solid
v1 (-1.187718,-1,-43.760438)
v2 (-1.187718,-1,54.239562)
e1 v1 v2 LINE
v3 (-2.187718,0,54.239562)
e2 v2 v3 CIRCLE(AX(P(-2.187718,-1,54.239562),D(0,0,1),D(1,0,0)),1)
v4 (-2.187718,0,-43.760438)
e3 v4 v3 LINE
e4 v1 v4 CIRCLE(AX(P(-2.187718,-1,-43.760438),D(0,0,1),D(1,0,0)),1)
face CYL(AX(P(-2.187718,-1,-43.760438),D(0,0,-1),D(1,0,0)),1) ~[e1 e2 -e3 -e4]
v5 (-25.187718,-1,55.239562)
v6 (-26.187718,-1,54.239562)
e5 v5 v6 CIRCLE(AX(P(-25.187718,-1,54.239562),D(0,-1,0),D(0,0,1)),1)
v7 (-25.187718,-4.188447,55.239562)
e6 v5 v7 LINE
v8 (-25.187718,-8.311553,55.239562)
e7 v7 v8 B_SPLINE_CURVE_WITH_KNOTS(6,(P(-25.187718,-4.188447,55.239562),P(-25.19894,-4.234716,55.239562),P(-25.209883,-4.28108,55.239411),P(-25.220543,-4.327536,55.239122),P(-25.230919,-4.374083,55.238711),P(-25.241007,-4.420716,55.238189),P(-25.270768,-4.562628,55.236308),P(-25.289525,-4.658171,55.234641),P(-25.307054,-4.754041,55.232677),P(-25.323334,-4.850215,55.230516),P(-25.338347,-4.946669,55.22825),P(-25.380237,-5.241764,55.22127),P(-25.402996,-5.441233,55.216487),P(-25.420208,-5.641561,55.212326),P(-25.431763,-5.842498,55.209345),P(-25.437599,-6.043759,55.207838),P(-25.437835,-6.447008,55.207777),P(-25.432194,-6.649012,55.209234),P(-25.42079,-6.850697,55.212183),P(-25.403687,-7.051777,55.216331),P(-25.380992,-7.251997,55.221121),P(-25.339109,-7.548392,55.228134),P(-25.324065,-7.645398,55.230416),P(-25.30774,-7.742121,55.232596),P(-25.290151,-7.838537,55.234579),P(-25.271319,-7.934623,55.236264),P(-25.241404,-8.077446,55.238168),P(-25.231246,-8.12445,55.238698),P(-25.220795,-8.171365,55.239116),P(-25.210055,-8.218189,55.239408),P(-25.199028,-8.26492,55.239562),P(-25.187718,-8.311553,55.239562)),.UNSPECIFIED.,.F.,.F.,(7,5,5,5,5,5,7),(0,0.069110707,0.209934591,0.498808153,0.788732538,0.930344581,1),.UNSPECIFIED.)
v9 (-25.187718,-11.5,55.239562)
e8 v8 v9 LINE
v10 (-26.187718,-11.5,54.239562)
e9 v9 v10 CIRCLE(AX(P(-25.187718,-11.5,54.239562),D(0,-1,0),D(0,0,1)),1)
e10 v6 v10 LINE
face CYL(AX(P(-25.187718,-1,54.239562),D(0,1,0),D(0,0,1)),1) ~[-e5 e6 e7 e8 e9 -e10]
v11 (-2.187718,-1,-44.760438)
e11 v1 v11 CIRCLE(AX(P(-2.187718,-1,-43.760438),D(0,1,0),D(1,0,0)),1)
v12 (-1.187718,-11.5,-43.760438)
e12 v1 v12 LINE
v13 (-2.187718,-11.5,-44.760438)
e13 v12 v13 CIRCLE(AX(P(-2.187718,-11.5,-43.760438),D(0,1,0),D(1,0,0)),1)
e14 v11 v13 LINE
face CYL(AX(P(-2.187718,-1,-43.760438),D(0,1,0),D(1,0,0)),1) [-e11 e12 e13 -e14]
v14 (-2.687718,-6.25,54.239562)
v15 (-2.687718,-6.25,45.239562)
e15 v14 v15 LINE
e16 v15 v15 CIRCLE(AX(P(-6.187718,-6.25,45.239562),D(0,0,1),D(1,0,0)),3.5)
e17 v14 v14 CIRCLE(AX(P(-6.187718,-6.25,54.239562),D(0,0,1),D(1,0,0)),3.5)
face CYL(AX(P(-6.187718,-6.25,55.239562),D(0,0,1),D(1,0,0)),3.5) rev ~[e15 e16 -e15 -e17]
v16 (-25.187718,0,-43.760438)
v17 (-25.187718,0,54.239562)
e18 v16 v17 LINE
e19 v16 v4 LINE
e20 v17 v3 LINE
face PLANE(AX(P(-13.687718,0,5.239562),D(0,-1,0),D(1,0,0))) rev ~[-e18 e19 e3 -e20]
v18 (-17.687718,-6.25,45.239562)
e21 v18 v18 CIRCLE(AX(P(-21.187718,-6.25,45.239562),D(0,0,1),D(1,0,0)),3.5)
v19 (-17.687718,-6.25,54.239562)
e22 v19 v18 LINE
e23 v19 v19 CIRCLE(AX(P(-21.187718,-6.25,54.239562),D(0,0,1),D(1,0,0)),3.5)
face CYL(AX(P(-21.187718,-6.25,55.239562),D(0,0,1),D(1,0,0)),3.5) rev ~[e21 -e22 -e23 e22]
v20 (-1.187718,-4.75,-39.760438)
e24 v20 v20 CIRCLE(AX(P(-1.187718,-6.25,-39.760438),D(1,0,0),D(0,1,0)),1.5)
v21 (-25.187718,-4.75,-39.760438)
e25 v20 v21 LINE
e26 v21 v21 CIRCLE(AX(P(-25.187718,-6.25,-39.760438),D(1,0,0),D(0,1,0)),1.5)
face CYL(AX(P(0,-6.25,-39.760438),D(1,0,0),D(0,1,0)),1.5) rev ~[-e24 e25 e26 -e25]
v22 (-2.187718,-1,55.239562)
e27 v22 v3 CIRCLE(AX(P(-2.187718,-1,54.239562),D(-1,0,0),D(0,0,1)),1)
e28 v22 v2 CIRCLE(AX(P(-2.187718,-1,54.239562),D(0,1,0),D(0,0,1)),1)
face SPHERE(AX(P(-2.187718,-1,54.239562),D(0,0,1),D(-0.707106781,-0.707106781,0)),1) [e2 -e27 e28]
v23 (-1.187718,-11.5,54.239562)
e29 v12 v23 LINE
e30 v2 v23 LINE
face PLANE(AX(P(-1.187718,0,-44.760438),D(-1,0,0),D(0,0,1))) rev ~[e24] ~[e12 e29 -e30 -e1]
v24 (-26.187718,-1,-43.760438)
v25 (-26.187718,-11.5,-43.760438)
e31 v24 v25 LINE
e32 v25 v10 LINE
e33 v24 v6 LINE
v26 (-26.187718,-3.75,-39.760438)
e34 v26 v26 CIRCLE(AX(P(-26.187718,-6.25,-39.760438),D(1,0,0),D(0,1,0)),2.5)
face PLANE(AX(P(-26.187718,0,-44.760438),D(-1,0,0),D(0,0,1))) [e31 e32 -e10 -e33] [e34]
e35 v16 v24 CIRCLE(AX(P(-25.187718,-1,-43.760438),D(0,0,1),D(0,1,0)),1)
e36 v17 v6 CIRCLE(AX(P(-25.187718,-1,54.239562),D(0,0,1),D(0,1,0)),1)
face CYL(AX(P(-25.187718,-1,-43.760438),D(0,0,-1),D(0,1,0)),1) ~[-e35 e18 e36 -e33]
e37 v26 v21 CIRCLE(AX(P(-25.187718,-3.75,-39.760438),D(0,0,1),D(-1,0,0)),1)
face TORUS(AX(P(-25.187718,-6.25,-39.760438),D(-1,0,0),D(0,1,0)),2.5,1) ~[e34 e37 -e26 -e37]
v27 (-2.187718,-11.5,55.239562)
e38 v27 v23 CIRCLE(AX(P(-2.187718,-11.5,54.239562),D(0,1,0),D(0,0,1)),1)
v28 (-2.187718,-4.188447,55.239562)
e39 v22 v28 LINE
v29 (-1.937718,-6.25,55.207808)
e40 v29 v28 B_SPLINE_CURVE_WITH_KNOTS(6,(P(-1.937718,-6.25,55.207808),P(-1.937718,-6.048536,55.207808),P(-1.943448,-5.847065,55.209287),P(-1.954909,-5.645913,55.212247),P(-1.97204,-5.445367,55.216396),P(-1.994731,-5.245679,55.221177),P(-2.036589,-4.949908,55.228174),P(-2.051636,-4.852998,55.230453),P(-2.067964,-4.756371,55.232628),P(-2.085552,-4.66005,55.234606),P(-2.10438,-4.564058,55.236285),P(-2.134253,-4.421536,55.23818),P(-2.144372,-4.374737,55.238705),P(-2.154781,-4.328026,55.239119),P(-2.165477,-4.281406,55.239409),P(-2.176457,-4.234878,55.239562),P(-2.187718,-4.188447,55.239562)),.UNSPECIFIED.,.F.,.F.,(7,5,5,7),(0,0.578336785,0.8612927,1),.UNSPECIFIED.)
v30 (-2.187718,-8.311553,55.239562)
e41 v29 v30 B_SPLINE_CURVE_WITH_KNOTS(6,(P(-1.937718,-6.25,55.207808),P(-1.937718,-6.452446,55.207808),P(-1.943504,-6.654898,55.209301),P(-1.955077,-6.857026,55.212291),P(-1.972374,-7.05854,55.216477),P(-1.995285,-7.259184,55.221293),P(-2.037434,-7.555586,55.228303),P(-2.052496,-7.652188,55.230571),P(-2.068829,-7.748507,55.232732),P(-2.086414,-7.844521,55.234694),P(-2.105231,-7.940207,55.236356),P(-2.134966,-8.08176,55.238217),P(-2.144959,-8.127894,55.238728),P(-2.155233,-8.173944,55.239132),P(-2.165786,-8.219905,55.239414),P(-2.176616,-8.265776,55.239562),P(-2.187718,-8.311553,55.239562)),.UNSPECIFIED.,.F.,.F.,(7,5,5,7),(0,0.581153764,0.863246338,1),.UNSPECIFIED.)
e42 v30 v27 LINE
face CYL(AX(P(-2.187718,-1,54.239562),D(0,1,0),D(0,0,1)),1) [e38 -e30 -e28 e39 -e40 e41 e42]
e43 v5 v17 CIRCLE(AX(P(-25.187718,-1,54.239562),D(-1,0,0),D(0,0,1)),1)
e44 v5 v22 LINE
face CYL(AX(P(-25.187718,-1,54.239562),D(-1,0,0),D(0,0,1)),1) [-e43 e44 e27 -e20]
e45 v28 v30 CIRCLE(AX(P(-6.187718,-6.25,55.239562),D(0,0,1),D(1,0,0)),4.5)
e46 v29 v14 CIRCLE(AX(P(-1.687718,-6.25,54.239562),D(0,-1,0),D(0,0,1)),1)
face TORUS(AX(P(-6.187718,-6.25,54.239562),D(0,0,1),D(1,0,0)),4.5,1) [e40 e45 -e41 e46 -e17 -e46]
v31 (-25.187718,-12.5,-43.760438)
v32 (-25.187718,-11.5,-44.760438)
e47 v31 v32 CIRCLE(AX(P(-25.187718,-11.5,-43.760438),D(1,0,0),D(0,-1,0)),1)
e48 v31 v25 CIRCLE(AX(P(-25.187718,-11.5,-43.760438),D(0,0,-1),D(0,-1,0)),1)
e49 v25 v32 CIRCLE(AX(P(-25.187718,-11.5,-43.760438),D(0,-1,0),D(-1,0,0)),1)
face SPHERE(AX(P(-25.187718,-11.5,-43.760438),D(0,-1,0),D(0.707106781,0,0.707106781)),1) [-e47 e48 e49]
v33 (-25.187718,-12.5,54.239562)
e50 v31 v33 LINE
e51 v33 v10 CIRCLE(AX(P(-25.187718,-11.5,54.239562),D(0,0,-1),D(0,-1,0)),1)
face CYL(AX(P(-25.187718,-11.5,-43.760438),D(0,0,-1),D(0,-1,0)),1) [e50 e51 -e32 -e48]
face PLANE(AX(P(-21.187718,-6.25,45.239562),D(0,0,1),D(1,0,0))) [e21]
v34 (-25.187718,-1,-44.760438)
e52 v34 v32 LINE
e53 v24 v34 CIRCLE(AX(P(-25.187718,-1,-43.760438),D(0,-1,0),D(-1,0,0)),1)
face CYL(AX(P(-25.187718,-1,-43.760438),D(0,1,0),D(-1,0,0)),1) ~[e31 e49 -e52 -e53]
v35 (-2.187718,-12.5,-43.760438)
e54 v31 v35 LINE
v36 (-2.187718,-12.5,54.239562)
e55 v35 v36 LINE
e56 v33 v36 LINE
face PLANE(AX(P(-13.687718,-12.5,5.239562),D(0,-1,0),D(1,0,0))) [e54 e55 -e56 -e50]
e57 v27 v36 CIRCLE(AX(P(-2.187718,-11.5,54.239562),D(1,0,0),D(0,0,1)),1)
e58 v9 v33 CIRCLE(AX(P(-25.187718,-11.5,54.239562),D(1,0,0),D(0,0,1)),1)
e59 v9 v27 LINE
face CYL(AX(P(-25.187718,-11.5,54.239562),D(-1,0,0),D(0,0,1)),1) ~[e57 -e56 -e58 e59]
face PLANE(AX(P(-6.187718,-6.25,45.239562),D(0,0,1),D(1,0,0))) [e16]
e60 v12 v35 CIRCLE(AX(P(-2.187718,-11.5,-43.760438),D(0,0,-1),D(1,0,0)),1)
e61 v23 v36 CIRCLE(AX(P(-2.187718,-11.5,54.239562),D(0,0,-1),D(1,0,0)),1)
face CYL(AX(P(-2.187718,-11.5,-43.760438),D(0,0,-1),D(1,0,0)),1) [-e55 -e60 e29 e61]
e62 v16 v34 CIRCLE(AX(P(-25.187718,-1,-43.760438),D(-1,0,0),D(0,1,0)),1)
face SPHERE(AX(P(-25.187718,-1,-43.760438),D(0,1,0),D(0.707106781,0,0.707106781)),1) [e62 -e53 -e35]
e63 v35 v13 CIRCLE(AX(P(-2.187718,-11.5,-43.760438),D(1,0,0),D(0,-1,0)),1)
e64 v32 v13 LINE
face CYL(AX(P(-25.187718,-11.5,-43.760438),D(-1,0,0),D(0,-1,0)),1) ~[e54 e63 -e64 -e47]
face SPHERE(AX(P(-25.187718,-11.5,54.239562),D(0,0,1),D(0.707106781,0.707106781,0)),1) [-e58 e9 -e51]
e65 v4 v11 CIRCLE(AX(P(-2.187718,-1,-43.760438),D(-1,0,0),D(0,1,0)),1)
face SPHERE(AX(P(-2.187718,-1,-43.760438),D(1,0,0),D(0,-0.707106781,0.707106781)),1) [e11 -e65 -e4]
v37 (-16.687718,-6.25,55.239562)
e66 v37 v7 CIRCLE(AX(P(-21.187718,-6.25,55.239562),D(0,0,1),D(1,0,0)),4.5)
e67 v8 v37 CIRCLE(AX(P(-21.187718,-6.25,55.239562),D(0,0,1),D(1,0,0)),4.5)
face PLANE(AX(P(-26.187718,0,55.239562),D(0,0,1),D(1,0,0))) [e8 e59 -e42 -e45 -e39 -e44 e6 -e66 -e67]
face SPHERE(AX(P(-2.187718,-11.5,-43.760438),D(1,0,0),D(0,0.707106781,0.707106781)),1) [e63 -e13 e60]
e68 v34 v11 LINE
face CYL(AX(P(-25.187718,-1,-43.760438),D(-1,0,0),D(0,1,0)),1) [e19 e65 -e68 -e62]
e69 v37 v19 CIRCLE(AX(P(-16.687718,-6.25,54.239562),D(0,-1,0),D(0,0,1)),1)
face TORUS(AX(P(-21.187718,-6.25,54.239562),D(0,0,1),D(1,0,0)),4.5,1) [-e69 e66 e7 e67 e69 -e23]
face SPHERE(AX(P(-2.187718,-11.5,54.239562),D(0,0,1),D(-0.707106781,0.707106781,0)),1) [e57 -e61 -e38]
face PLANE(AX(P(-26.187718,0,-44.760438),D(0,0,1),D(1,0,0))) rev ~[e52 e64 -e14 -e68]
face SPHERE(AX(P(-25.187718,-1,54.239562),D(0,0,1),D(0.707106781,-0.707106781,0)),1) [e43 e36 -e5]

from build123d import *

# Parameters (mm, degrees)
F0_W         = 25
F0_H         = 100
F1_DEPTH     = 12.5
F2_R         = 1.5
F3_DEPTH     = 27.19003
F4_R         = 3.5
F5_DEPTH     = 10
F6_T1_DEPTH  = 10.5
F6_T3_DEPTH  = 23
F6_T5_DEPTH  = 98
F6_S9_W      = 1
F6_S9_H      = 1
F6_T10_DEPTH = 1
F6_S15_W     = 1
F6_S15_H     = 1
F6_T16_DEPTH = 1
F6_S21_W     = 1
F6_S21_H     = 1
F6_T22_DEPTH = 1
F6_S27_W     = 1
F6_S27_H     = 1
F6_T28_DEPTH = 1
F6_S33_W     = 1
F6_S33_H     = 1
F6_T34_DEPTH = 1
F6_S39_W     = 1
F6_S39_H     = 1
F6_T40_DEPTH = 1
F6_S45_W     = 1
F6_S45_H     = 1
F6_T46_DEPTH = 1
F6_S51_W     = 1
F6_S51_H     = 1
F6_T52_DEPTH = 1


# Not quite as in the source:
# - a fillet or chamfer that OpenCascade refuses, or shapes differently, is made with other operations: its cross-section is extruded or revolved along the edge and cut away or added


with BuildPart() as f1:
    # F0 (on Front) → F1 (new body)
    with BuildSketch(Plane.XZ):
        with Locations((-13.6877183104, 5.2395616682)):
            Rectangle(F0_W, F0_H)
    extrude(amount=F1_DEPTH)

    # F2 (on Right) → F3 (cut)
    with BuildSketch(Plane.YZ):
        with Locations((-6.25, -39.7604383318)):
            Circle(F2_R)
    extrude(amount=-F3_DEPTH, mode=Mode.SUBTRACT)

    # F4 (on face) → F5 (cut)
    with BuildSketch(Plane.XY.offset(55.2395616682)):
        with Locations((-6.1877183104, -6.25)):
            Circle(F4_R)
        with Locations((-21.1877183104, -6.25)):
            Circle(F4_R)
    extrude(amount=-F5_DEPTH, mode=Mode.SUBTRACT)

    # F6: fillet of radius 1 on 15 edges, made by hand

    # F6_s2 → F6_t1 (cut)
    with BuildSketch(Plane.XZ.offset(1)):
        with BuildLine():
            ThreePointArc((-25.1877183104, 55.2395616682), (-25.8948250916, 54.9466684494), (-26.1877183104, 54.2395616682))
            Line((-26.1877183104, 54.2395616682), (-26.1877183104, 55.2395616682))
            Line((-26.1877183104, 55.2395616682), (-25.1877183104, 55.2395616682))
        make_face()
        with BuildLine():
            ThreePointArc((-2.1877183104, 55.2395616682), (-1.4806115292, 54.9466684494), (-1.1877183104, 54.2395616682))
            Line((-1.1877183104, 54.2395616682), (-1.1877183104, 55.2395616682))
            Line((-1.1877183104, 55.2395616682), (-2.1877183104, 55.2395616682))
        make_face()
        with BuildLine():
            ThreePointArc((-26.1877183104, -43.7604383318), (-25.8948250916, -44.467545113), (-25.1877183104, -44.7604383318))
            Line((-25.1877183104, -44.7604383318), (-26.1877183104, -44.7604383318))
            Line((-26.1877183104, -44.7604383318), (-26.1877183104, -43.7604383318))
        make_face()
        with BuildLine():
            ThreePointArc((-1.1877183104, -43.7604383318), (-1.4806115292, -44.467545113), (-2.1877183104, -44.7604383318))
            Line((-2.1877183104, -44.7604383318), (-1.1877183104, -44.7604383318))
            Line((-1.1877183104, -44.7604383318), (-1.1877183104, -43.7604383318))
        make_face()
    extrude(amount=F6_T1_DEPTH, mode=Mode.SUBTRACT)

    # F6_s4 → F6_t3 (cut)
    with BuildSketch(Plane.YZ.offset(-25.1877183104)):
        with BuildLine():
            ThreePointArc((-11.5, 55.2395616682), (-12.2071067812, 54.9466684494), (-12.5, 54.2395616682))
            Line((-12.5, 54.2395616682), (-12.5, 55.2395616682))
            Line((-12.5, 55.2395616682), (-11.5, 55.2395616682))
        make_face()
        with BuildLine():
            ThreePointArc((-1, 55.2395616682), (-0.2928932188, 54.9466684494), (0, 54.2395616682))
            Line((0, 54.2395616682), (0, 55.2395616682))
            Line((0, 55.2395616682), (-1, 55.2395616682))
        make_face()
        with BuildLine():
            ThreePointArc((0, -43.7604383318), (-0.2928932188, -44.467545113), (-1, -44.7604383318))
            Line((-1, -44.7604383318), (0, -44.7604383318))
            Line((0, -44.7604383318), (0, -43.7604383318))
        make_face()
        with BuildLine():
            ThreePointArc((-12.5, -43.7604383318), (-12.2071067812, -44.467545113), (-11.5, -44.7604383318))
            Line((-11.5, -44.7604383318), (-12.5, -44.7604383318))
            Line((-12.5, -44.7604383318), (-12.5, -43.7604383318))
        make_face()
    extrude(amount=F6_T3_DEPTH, mode=Mode.SUBTRACT)

    # F6_s6 → F6_t5 (cut)
    with BuildSketch(Plane.XY.offset(-43.7604383318)):
        with BuildLine():
            ThreePointArc((-25.1877183104, 0), (-25.8948250916, -0.2928932188), (-26.1877183104, -1))
            Line((-26.1877183104, -1), (-26.1877183104, 0))
            Line((-26.1877183104, 0), (-25.1877183104, 0))
        make_face()
        with BuildLine():
            ThreePointArc((-1.1877183104, -1), (-1.4806115292, -0.2928932188), (-2.1877183104, 0))
            Line((-2.1877183104, 0), (-1.1877183104, 0))
            Line((-1.1877183104, 0), (-1.1877183104, -1))
        make_face()
        with BuildLine():
            ThreePointArc((-25.1877183104, -12.5), (-25.8948250916, -12.2071067812), (-26.1877183104, -11.5))
            Line((-26.1877183104, -11.5), (-26.1877183104, -12.5))
            Line((-26.1877183104, -12.5), (-25.1877183104, -12.5))
        make_face()
        with BuildLine():
            ThreePointArc((-1.1877183104, -11.5), (-1.4806115292, -12.2071067812), (-2.1877183104, -12.5))
            Line((-2.1877183104, -12.5), (-1.1877183104, -12.5))
            Line((-1.1877183104, -12.5), (-1.1877183104, -11.5))
        make_face()
    extrude(amount=F6_T5_DEPTH, mode=Mode.SUBTRACT)


with BuildPart() as f6_tool8:
    # F6_s9 → F6_t10 (new body)
    with BuildSketch(Plane.XY.offset(54.2395616682)):
        with Locations((-25.6877183104, -0.5)):
            Rectangle(F6_S9_W, F6_S9_H)
    extrude(amount=F6_T10_DEPTH)

    # F6_s11 → F6_t12 (revolve, cut)
    with BuildSketch(Plane(origin=(-25.1877183104, -1, 54.2395616682), x_dir=(0.7071067812, -0.7071067812, 0), z_dir=(-0.7071067812, -0.7071067812, 0))):
        with BuildLine():
            ThreePointArc((0, -1), (1, 0), (0, 1))
            Line((0, 1), (0, -1))
        make_face()
    revolve(axis=Axis((-25.1877183104, -1, 54.2395616682), (0, 0, 1)), mode=Mode.SUBTRACT)


with BuildPart() as f1_1:
    add(f1.part)

    # F6_t7: cut F6_tool8
    add(f6_tool8.part, mode=Mode.SUBTRACT)


with BuildPart() as f6_tool14:
    # F6_s15 → F6_t16 (new body)
    with BuildSketch(Plane.XY.offset(54.2395616682)):
        with Locations((-25.6877183104, -12)):
            Rectangle(F6_S15_W, F6_S15_H)
    extrude(amount=F6_T16_DEPTH)

    # F6_s17 → F6_t18 (revolve, cut)
    with BuildSketch(Plane(origin=(-25.1877183104, -11.5, 54.2395616682), x_dir=(0.7071067812, 0.7071067812, 0), z_dir=(0.7071067812, -0.7071067812, 0))):
        with BuildLine():
            ThreePointArc((0, -1), (1, 0), (0, 1))
            Line((0, 1), (0, -1))
        make_face()
    revolve(axis=Axis((-25.1877183104, -11.5, 54.2395616682), (0, 0, 1)), mode=Mode.SUBTRACT)


with BuildPart() as f1_2:
    add(f1_1.part)

    # F6_t13: cut F6_tool14
    add(f6_tool14.part, mode=Mode.SUBTRACT)


with BuildPart() as f6_tool20:
    # F6_s21 → F6_t22 (new body)
    with BuildSketch(Plane.XY.offset(54.2395616682)):
        with Locations((-1.6877183104, -12)):
            Rectangle(F6_S21_W, F6_S21_H)
    extrude(amount=F6_T22_DEPTH)

    # F6_s23 → F6_t24 (revolve, cut)
    with BuildSketch(Plane(origin=(-2.1877183104, -11.5, 54.2395616682), x_dir=(-0.7071067812, 0.7071067812, 0), z_dir=(0.7071067812, 0.7071067812, 0))):
        with BuildLine():
            ThreePointArc((0, -1), (1, 0), (0, 1))
            Line((0, 1), (0, -1))
        make_face()
    revolve(axis=Axis((-2.1877183104, -11.5, 54.2395616682), (0, 0, 1)), mode=Mode.SUBTRACT)


with BuildPart() as f1_3:
    add(f1_2.part)

    # F6_t19: cut F6_tool20
    add(f6_tool20.part, mode=Mode.SUBTRACT)


with BuildPart() as f6_tool26:
    # F6_s27 → F6_t28 (new body)
    with BuildSketch(Plane.XY.offset(54.2395616682)):
        with Locations((-1.6877183104, -0.5)):
            Rectangle(F6_S27_W, F6_S27_H)
    extrude(amount=F6_T28_DEPTH)

    # F6_s29 → F6_t30 (revolve, cut)
    with BuildSketch(Plane(origin=(-2.1877183104, -1, 54.2395616682), x_dir=(-0.7071067812, -0.7071067812, 0), z_dir=(-0.7071067812, 0.7071067812, 0))):
        with BuildLine():
            ThreePointArc((0, -1), (1, 0), (0, 1))
            Line((0, 1), (0, -1))
        make_face()
    revolve(axis=Axis((-2.1877183104, -1, 54.2395616682), (0, 0, 1)), mode=Mode.SUBTRACT)


with BuildPart() as f1_4:
    add(f1_3.part)

    # F6_t25: cut F6_tool26
    add(f6_tool26.part, mode=Mode.SUBTRACT)


with BuildPart() as f6_tool32:
    # F6_s33 → F6_t34 (new body)
    with BuildSketch(Plane.XZ.offset(1)):
        with Locations((-25.6877183104, -44.2604383318)):
            Rectangle(F6_S33_W, F6_S33_H)
    extrude(amount=-F6_T34_DEPTH)

    # F6_s35 → F6_t36 (revolve, cut)
    with BuildSketch(Plane(origin=(-25.1877183104, -1, -43.7604383318), x_dir=(0.7071067812, 0, 0.7071067812), z_dir=(-0.7071067812, 0, 0.7071067812))):
        with BuildLine():
            ThreePointArc((0, -1), (1, 0), (0, 1))
            Line((0, 1), (0, -1))
        make_face()
    revolve(axis=Axis((-25.1877183104, -1, -43.7604383318), (0, 1, 0)), mode=Mode.SUBTRACT)


with BuildPart() as f1_5:
    add(f1_4.part)

    # F6_t31: cut F6_tool32
    add(f6_tool32.part, mode=Mode.SUBTRACT)


with BuildPart() as f6_tool38:
    # F6_s39 → F6_t40 (new body)
    with BuildSketch(Plane.YZ.offset(-2.1877183104)):
        with Locations((-0.5, -44.2604383318)):
            Rectangle(F6_S39_W, F6_S39_H)
    extrude(amount=F6_T40_DEPTH)

    # F6_s41 → F6_t42 (revolve, cut)
    with BuildSketch(Plane(origin=(-2.1877183104, -1, -43.7604383318), x_dir=(0, -0.7071067812, 0.7071067812), z_dir=(0, 0.7071067812, 0.7071067812))):
        with BuildLine():
            ThreePointArc((0, -1), (1, 0), (0, 1))
            Line((0, 1), (0, -1))
        make_face()
    revolve(axis=Axis((-2.1877183104, -1, -43.7604383318), (1, 0, 0)), mode=Mode.SUBTRACT)


with BuildPart() as f1_6:
    add(f1_5.part)

    # F6_t37: cut F6_tool38
    add(f6_tool38.part, mode=Mode.SUBTRACT)


with BuildPart() as f6_tool44:
    # F6_s45 → F6_t46 (new body)
    with BuildSketch(Plane.XZ.offset(11.5)):
        with Locations((-25.6877183104, -44.2604383318)):
            Rectangle(F6_S45_W, F6_S45_H)
    extrude(amount=F6_T46_DEPTH)

    # F6_s47 → F6_t48 (revolve, cut)
    with BuildSketch(Plane(origin=(-25.1877183104, -11.5, -43.7604383318), x_dir=(0.7071067812, 0, 0.7071067812), z_dir=(0.7071067812, 0, -0.7071067812))):
        with BuildLine():
            ThreePointArc((0, -1), (1, 0), (0, 1))
            Line((0, 1), (0, -1))
        make_face()
    revolve(axis=Axis((-25.1877183104, -11.5, -43.7604383318), (0, -1, 0)), mode=Mode.SUBTRACT)


with BuildPart() as f1_7:
    add(f1_6.part)

    # F6_t43: cut F6_tool44
    add(f6_tool44.part, mode=Mode.SUBTRACT)


with BuildPart() as f6_tool50:
    # F6_s51 → F6_t52 (new body)
    with BuildSketch(Plane.YZ.offset(-2.1877183104)):
        with Locations((-12, -44.2604383318)):
            Rectangle(F6_S51_W, F6_S51_H)
    extrude(amount=F6_T52_DEPTH)

    # F6_s53 → F6_t54 (revolve, cut)
    with BuildSketch(Plane(origin=(-2.1877183104, -11.5, -43.7604383318), x_dir=(0, 0.7071067812, 0.7071067812), z_dir=(0, 0.7071067812, -0.7071067812))):
        with BuildLine():
            ThreePointArc((0, -1), (1, 0), (0, 1))
            Line((0, 1), (0, -1))
        make_face()
    revolve(axis=Axis((-2.1877183104, -11.5, -43.7604383318), (1, 0, 0)), mode=Mode.SUBTRACT)


with BuildPart() as f1_8:
    add(f1_7.part)

    # F6_t49: cut F6_tool50
    add(f6_tool50.part, mode=Mode.SUBTRACT)

    # F6_s55 → F6_t56 (revolve, cut)
    with BuildSketch(Plane.XY.offset(-39.7604383318)):
        with BuildLine():
            ThreePointArc((-26.1877183104, -3.75), (-25.8948250916, -4.4571067812), (-25.1877183104, -4.75))
            Line((-25.1877183104, -4.75), (-26.1877183104, -4.75))
            Line((-26.1877183104, -4.75), (-26.1877183104, -3.75))
        make_face()
    revolve(axis=Axis((-26.1877183104, -6.25, -39.7604383318), (1, 0, 0)), mode=Mode.SUBTRACT)

    # F6_s57 → F6_t58 (revolve, cut)
    with BuildSketch(Plane.XZ.offset(6.25)):
        with BuildLine():
            ThreePointArc((-16.6877183104, 55.2395616682), (-17.3948250916, 54.9466684494), (-17.6877183104, 54.2395616682))
            Line((-17.6877183104, 54.2395616682), (-17.6877183104, 55.2395616682))
            Line((-17.6877183104, 55.2395616682), (-16.6877183104, 55.2395616682))
        make_face()
    revolve(axis=Axis((-21.1877183104, -6.25, 55.2395616682), (0, 0, 1)), mode=Mode.SUBTRACT)

    # F6_s59 → F6_t60 (revolve, cut)
    with BuildSketch(Plane.XZ.offset(6.25)):
        with BuildLine():
            ThreePointArc((-1.6877183104, 55.2395616682), (-2.3948250916, 54.9466684494), (-2.6877183104, 54.2395616682))
            Line((-2.6877183104, 54.2395616682), (-2.6877183104, 55.2395616682))
            Line((-2.6877183104, 55.2395616682), (-1.6877183104, 55.2395616682))
        make_face()
    revolve(axis=Axis((-6.1877183104, -6.25, 55.2395616682), (0, 0, 1)), mode=Mode.SUBTRACT)


solid = f1_8.part
